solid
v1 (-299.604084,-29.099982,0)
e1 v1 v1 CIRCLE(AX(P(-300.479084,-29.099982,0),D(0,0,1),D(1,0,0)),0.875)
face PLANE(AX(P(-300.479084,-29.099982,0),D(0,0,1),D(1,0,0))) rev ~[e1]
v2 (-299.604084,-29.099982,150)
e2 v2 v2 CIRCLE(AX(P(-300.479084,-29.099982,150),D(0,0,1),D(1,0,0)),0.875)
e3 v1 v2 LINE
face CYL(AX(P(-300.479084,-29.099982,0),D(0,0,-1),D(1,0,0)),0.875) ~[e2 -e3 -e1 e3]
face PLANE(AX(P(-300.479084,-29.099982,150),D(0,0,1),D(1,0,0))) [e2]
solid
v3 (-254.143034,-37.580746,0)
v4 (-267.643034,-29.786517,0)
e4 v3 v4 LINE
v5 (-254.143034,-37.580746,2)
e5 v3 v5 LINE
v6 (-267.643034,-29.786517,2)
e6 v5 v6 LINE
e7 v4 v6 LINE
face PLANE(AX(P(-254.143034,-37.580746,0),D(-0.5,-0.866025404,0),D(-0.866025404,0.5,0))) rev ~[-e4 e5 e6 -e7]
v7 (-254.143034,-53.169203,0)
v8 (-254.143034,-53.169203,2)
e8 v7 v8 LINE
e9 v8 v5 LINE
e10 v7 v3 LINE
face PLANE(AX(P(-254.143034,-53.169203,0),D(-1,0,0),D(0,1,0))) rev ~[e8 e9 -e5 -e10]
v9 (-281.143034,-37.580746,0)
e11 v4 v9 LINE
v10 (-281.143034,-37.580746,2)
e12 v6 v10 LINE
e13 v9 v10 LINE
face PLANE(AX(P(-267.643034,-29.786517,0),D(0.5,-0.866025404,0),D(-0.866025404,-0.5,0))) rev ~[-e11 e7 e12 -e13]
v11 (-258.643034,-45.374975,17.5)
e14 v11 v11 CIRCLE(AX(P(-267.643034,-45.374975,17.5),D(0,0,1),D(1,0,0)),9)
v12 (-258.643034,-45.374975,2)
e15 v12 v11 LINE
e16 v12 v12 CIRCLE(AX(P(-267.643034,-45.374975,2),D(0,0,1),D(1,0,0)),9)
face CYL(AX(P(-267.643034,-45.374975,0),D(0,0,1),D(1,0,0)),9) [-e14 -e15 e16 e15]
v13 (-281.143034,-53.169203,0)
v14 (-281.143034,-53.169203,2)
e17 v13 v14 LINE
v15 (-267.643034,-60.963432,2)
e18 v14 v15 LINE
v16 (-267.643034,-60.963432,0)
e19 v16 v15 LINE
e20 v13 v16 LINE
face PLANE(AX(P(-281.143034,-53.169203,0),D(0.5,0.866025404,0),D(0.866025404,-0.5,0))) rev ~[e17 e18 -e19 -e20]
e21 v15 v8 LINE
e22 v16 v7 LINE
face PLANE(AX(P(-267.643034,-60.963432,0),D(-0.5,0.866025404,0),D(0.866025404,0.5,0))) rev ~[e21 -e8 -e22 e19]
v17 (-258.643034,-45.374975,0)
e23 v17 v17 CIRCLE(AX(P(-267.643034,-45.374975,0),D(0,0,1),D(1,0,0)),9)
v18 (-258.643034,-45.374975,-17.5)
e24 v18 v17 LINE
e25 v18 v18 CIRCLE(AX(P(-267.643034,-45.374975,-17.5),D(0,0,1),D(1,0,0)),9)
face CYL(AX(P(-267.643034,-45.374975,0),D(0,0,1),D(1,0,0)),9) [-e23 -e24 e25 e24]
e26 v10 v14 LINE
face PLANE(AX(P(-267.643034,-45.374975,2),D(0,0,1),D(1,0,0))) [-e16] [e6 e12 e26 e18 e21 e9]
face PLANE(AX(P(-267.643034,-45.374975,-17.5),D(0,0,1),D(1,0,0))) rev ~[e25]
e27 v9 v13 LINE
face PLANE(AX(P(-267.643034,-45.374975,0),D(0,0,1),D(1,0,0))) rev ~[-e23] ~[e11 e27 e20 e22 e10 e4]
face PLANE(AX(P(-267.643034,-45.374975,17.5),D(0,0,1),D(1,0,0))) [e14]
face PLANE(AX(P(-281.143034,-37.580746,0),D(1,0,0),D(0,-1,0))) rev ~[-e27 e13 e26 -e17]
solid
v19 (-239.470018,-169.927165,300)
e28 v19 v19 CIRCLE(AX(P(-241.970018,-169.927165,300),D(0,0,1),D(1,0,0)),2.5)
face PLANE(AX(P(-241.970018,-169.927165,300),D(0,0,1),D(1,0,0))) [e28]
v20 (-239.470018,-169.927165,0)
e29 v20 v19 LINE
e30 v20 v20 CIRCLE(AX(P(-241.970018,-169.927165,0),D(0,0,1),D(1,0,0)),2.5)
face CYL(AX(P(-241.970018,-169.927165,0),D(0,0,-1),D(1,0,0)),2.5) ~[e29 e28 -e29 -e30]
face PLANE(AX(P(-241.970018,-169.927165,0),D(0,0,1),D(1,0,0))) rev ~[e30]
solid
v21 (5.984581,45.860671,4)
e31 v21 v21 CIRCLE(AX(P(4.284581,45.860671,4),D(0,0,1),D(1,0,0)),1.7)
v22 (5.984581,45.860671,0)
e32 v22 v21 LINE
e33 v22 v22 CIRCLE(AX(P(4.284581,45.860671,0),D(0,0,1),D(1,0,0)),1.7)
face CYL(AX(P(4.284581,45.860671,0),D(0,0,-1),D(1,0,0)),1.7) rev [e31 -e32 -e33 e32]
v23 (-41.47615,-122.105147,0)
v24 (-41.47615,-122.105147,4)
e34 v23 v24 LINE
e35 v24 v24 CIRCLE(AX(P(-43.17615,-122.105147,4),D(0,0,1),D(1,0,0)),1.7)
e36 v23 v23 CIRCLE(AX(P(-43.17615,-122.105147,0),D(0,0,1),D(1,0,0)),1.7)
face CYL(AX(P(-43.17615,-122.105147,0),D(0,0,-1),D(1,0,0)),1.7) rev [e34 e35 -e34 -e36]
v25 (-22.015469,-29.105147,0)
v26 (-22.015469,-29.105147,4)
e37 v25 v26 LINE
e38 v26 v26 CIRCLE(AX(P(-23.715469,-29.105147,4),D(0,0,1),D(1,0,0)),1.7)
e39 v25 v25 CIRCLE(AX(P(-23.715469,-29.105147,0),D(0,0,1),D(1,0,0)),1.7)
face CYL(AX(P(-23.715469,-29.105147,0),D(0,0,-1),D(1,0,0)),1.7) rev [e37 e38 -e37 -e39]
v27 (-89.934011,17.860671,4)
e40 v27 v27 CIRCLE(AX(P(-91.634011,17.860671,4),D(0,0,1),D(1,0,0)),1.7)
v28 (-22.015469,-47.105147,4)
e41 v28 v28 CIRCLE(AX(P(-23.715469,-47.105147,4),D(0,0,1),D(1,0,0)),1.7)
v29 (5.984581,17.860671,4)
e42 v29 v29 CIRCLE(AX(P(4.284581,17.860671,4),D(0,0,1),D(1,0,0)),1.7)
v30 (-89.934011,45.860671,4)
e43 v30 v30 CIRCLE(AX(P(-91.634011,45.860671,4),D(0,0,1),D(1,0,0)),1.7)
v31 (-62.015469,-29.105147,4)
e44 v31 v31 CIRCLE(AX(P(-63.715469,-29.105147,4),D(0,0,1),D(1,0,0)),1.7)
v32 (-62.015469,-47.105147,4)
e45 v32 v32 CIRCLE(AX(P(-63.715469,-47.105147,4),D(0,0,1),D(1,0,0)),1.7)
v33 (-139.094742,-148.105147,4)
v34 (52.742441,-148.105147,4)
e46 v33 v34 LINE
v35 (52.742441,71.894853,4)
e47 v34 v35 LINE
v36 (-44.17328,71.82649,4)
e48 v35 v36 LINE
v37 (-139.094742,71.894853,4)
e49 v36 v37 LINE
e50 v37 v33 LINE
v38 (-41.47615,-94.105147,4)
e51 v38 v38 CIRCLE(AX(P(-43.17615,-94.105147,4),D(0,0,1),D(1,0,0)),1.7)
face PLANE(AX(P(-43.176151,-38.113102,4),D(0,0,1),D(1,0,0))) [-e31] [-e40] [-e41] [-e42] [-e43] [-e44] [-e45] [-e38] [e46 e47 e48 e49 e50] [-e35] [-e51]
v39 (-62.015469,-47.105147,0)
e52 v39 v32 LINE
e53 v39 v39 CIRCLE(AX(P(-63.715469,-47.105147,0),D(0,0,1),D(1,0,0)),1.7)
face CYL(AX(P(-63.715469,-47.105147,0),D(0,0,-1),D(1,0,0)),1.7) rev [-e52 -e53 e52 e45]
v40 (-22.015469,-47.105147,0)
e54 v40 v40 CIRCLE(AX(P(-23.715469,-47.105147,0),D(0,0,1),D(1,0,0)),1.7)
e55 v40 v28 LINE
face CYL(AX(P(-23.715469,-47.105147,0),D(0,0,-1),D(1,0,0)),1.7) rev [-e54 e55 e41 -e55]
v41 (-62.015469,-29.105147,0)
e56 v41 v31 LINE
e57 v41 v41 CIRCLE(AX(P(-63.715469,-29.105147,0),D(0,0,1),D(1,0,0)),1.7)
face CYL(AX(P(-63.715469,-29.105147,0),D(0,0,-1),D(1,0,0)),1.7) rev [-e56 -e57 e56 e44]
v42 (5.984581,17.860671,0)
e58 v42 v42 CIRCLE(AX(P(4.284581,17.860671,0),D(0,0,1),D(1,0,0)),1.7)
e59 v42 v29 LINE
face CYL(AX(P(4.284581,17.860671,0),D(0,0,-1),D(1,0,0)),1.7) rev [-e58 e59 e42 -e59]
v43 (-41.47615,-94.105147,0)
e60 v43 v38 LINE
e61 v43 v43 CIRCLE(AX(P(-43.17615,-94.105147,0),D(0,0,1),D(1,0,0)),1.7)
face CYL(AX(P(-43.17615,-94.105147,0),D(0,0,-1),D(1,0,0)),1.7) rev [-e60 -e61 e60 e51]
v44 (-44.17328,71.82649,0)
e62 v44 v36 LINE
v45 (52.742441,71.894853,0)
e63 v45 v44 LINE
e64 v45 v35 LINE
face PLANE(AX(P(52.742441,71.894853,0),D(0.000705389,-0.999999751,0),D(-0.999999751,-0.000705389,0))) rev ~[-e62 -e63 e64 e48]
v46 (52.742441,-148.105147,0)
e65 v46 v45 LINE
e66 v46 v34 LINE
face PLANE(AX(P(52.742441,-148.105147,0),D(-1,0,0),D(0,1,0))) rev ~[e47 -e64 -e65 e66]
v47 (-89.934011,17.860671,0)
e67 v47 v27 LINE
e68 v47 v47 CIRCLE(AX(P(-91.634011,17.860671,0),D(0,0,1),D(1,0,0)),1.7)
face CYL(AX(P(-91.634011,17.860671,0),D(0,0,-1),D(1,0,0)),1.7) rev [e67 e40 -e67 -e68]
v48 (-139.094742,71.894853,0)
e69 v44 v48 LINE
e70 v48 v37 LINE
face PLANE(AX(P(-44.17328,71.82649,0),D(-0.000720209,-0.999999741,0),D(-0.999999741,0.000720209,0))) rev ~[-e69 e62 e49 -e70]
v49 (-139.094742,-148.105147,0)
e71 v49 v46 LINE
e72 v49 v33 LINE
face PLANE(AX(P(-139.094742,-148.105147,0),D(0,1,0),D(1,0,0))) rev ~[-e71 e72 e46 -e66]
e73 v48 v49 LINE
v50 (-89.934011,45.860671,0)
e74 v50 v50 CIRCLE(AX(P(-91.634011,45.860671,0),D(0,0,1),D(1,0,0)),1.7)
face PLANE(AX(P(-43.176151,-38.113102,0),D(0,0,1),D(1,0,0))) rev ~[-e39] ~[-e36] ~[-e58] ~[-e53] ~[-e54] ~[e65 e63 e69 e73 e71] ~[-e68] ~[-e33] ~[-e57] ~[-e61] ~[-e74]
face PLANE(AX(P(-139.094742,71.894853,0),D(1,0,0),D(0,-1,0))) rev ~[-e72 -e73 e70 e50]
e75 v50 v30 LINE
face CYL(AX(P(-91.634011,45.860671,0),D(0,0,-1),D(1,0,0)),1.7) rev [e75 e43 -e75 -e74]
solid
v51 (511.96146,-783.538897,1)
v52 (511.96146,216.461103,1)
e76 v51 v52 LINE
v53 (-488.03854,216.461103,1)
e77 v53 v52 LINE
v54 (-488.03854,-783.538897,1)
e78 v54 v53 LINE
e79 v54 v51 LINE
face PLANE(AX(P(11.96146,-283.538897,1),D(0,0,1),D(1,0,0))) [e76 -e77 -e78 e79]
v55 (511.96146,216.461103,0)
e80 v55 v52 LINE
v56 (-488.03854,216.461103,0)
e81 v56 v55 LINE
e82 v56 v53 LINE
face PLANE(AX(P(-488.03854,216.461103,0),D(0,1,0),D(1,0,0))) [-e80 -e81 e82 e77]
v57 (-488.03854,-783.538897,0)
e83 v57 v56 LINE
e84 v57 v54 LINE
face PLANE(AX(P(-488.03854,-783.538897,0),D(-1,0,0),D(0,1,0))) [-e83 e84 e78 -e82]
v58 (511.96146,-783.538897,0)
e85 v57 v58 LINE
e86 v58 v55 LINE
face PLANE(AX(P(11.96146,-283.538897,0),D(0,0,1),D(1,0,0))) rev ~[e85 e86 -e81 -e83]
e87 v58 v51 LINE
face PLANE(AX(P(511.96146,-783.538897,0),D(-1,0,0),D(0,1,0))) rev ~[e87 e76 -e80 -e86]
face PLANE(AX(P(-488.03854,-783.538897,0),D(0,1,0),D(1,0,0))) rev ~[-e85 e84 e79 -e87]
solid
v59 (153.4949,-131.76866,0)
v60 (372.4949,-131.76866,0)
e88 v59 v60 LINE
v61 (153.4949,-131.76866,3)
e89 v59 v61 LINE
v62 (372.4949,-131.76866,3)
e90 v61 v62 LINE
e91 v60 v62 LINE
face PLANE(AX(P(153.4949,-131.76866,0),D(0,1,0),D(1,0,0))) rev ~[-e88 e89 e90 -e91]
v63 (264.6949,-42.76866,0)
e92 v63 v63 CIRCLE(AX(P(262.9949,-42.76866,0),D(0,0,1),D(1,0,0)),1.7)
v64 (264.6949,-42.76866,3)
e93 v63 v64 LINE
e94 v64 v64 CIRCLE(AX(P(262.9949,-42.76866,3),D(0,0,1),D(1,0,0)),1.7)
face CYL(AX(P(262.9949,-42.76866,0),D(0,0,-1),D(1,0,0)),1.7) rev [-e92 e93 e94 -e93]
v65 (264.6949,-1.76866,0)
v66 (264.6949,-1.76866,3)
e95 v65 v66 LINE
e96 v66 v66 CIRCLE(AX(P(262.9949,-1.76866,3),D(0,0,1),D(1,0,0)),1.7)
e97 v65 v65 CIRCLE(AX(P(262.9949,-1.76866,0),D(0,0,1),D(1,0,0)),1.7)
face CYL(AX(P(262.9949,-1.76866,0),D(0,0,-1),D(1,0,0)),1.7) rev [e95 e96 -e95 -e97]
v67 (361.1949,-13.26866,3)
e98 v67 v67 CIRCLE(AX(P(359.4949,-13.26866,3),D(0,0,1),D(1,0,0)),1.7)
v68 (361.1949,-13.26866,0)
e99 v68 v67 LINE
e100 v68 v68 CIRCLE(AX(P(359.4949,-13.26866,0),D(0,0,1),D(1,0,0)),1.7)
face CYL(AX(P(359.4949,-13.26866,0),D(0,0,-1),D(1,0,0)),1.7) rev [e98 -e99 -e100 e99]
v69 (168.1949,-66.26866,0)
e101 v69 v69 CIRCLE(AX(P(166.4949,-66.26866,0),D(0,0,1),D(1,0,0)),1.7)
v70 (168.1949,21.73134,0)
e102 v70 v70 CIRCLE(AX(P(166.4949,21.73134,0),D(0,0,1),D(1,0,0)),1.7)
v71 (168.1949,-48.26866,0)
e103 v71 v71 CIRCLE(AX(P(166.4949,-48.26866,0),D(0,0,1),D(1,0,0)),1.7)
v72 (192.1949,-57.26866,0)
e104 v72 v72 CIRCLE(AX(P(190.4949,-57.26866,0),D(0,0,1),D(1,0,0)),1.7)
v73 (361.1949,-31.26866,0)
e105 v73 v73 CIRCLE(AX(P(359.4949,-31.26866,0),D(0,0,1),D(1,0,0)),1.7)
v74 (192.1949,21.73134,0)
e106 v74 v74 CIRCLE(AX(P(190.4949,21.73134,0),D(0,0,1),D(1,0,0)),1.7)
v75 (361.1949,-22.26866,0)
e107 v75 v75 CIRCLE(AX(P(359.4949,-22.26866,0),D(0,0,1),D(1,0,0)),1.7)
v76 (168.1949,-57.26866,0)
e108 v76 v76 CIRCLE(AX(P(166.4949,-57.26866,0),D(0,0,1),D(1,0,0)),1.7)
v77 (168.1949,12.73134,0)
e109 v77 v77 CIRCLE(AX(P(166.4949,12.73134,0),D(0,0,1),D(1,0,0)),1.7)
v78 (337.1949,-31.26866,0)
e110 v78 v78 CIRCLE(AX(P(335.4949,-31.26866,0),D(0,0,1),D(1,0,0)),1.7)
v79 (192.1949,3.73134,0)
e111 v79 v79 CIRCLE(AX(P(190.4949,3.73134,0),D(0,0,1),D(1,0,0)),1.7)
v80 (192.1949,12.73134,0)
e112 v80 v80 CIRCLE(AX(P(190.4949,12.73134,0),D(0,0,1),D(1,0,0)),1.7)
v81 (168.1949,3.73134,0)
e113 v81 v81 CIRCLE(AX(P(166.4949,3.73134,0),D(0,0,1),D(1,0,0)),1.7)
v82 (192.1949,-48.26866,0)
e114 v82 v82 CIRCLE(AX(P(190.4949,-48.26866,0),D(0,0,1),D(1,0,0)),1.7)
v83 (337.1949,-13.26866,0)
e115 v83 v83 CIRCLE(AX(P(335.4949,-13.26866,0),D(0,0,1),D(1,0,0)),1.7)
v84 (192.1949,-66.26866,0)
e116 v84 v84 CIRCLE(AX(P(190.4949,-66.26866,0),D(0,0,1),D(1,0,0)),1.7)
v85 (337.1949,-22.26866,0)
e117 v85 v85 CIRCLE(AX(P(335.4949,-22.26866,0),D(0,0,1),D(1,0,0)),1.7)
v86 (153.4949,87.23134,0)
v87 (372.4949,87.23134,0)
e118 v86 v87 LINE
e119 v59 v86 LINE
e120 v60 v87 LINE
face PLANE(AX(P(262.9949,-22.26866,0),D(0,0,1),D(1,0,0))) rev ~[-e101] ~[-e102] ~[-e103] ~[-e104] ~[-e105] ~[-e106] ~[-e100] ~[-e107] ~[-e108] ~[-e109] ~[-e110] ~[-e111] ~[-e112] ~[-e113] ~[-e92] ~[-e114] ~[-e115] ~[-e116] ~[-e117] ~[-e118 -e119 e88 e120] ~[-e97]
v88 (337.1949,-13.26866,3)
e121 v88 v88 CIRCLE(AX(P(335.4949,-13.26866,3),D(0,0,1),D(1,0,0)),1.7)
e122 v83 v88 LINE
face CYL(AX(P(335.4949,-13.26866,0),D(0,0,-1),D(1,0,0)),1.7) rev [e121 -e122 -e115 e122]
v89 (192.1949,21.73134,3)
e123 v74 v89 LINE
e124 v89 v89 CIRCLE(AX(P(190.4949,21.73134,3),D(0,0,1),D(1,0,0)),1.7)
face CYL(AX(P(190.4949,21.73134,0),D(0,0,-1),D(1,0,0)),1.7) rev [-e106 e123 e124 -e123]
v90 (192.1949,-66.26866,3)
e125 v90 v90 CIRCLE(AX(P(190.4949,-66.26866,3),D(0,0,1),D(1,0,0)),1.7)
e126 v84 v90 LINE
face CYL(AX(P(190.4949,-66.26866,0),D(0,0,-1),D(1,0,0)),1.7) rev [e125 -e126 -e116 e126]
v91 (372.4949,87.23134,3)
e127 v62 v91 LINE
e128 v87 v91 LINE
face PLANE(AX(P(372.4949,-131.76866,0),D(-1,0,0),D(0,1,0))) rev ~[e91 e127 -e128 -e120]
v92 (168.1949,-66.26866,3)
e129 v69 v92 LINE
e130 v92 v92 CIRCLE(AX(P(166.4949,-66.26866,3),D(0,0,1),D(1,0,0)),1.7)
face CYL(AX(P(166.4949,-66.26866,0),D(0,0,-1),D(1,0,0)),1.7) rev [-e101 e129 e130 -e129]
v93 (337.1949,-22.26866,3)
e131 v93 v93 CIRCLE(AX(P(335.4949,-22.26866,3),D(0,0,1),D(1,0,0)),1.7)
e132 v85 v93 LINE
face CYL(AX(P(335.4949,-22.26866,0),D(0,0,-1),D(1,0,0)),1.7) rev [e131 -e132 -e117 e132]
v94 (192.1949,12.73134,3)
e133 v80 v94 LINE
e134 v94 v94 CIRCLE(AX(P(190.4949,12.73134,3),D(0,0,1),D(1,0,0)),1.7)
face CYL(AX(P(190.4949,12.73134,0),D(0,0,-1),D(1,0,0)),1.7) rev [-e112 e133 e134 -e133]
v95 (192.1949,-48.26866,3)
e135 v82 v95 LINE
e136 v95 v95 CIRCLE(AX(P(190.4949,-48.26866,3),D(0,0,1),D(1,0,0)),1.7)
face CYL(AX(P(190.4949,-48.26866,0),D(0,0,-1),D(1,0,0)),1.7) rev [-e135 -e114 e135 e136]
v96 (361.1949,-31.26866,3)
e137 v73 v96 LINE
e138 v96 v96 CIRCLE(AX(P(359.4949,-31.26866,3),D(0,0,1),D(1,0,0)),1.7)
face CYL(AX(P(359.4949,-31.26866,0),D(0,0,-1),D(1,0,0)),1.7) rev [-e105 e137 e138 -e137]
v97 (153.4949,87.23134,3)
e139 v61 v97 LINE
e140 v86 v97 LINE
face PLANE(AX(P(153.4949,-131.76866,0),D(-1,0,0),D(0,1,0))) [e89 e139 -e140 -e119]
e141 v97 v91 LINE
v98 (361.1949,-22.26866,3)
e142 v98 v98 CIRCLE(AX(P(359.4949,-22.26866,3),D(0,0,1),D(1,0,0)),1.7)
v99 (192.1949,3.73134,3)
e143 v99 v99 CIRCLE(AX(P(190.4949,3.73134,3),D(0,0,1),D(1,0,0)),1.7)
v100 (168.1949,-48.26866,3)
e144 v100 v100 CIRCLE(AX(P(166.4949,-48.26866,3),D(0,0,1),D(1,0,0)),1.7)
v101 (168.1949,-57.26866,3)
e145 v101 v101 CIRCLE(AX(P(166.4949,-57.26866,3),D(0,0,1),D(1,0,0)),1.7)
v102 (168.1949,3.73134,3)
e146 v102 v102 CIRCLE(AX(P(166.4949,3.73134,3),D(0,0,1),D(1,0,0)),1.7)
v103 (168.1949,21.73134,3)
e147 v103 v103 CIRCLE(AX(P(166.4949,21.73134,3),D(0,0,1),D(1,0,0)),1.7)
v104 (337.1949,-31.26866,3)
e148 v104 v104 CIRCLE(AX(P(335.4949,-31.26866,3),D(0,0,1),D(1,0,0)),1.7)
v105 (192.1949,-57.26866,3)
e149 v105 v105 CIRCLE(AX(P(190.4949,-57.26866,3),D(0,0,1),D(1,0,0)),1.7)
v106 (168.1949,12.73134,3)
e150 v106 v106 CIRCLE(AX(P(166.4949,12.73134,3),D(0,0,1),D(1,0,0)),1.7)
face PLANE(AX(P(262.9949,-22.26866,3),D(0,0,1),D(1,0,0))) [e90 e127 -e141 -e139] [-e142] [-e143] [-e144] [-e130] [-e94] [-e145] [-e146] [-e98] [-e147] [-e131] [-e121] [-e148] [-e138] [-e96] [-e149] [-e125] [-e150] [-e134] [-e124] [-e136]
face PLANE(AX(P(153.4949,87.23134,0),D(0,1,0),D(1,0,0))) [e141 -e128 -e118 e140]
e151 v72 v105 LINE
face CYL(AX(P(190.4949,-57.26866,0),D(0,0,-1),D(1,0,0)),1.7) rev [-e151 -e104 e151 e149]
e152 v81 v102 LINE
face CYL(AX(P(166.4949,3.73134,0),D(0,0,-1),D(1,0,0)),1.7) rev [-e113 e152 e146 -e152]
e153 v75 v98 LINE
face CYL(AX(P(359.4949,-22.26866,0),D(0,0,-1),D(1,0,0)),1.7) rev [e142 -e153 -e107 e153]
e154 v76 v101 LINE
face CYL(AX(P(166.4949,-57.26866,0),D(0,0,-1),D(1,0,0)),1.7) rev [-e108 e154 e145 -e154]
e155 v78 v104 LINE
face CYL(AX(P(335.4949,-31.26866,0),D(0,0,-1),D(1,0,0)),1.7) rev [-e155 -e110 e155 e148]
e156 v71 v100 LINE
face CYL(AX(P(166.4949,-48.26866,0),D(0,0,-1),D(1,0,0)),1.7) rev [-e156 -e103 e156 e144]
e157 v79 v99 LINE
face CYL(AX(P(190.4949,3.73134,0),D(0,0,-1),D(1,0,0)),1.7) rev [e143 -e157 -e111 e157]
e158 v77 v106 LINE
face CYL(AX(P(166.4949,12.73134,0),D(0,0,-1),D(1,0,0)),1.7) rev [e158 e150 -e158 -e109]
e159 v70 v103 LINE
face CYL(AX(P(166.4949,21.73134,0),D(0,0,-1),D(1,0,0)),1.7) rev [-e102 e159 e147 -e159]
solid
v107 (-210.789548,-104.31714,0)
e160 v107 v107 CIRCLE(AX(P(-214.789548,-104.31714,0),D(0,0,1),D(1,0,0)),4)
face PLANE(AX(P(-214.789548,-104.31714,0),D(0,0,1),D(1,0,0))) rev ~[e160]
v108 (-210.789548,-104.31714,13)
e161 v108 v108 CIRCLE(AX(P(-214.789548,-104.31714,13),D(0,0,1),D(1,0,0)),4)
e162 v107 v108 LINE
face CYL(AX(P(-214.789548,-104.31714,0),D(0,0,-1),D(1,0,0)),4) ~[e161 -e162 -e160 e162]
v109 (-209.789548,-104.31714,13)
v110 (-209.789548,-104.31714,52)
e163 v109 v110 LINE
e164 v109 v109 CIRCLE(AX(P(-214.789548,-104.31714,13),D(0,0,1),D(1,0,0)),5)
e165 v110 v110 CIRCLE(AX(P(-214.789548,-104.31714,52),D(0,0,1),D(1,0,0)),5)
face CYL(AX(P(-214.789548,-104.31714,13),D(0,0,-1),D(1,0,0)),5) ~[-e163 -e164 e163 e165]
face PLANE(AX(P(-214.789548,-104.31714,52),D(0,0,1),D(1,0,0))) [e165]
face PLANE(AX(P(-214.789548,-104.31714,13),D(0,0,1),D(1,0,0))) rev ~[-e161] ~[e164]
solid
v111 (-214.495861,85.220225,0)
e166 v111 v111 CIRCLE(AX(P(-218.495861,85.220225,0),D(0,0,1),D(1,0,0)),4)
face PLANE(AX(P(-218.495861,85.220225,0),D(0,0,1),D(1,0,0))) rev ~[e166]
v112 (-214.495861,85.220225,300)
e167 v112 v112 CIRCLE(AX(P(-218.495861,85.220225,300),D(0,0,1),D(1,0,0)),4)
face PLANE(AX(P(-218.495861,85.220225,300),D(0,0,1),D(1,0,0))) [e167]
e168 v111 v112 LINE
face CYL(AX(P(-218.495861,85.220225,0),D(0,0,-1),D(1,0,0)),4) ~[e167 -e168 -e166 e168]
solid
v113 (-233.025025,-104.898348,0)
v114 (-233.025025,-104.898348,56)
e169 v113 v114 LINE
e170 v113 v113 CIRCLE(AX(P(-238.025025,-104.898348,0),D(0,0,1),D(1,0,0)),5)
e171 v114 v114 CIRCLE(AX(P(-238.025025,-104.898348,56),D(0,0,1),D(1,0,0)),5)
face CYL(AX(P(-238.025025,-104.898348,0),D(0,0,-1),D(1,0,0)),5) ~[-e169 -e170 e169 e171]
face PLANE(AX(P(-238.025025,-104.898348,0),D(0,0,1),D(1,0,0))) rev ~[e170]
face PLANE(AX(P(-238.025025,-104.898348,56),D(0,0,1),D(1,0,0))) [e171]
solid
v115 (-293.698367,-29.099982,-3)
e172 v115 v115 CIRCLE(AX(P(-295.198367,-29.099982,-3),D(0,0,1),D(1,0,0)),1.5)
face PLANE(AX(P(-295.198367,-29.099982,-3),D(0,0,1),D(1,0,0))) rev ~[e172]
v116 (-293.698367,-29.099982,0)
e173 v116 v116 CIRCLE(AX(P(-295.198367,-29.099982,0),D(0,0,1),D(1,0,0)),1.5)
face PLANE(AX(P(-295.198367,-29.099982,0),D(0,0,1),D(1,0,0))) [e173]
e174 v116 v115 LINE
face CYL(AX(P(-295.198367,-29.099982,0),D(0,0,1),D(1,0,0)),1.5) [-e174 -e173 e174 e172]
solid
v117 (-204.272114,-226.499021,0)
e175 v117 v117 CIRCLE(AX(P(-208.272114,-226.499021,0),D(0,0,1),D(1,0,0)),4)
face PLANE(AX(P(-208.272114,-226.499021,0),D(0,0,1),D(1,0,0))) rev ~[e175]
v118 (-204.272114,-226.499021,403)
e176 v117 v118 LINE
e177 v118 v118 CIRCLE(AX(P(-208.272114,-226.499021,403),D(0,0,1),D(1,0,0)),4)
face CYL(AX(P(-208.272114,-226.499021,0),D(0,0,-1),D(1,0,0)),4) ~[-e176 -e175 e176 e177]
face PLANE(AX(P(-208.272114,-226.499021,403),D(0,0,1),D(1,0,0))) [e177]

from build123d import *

# Parameters (mm, degrees)
F0_R      = 1.7
F1_DEPTH  = 4
F2_R      = 4
F3_DEPTH  = 300
F4_W      = 1000
F4_H      = 1000
F5_DEPTH  = 1
F6_R      = 4
F7_DEPTH  = 403
F6_R_2    = 2.5
F8_DEPTH  = 300
F6_R_3    = 9
F9_DEPTH  = 17.5
F10_DEPTH = 2
F6_R_4    = 5
F11_DEPTH = 56
F12_START = 13
F12_DEPTH = 39
F13_DEPTH = 52
F14_W     = 219
F14_H     = 219
F14_R     = 1.7
F15_DEPTH = 3
F2_R_2    = 0.875
F16_DEPTH = 150
F14_R_2   = 1.5
F17_DEPTH = 3


with BuildPart() as f1:
    # F0 (on Top) → F1 (new body)
    with BuildSketch(Plane.XY):
        Polygon((-139.0947423129, 71.8948530406), (-139.0947423129, -148.1051469594), (52.7424413346, -148.1051469594), (52.7424413346, 71.8948530406), (-44.1732802409, 71.8264897118), align=None)
        with Locations((-63.7154691358, -47.1051469594)):
            Circle(F0_R, mode=Mode.SUBTRACT)
        with Locations((-43.1761504892, -122.1051469594)):
            Circle(F0_R, mode=Mode.SUBTRACT)
        with Locations((-43.1761504892, -94.1051469594)):
            Circle(F0_R, mode=Mode.SUBTRACT)
        with Locations((-23.7154691358, -47.1051469594)):
            Circle(F0_R, mode=Mode.SUBTRACT)
        with Locations((-63.7154691358, -29.1051469594)):
            Circle(F0_R, mode=Mode.SUBTRACT)
        with Locations((-91.6340112769, 17.8606713762)):
            Circle(F0_R, mode=Mode.SUBTRACT)
        with Locations((-91.6340112769, 45.8606713762)):
            Circle(F0_R, mode=Mode.SUBTRACT)
        with Locations((-23.7154691358, -29.1051469594)):
            Circle(F0_R, mode=Mode.SUBTRACT)
        with Locations((4.2845805468, 17.8606713762)):
            Circle(F0_R, mode=Mode.SUBTRACT)
        with Locations((4.2845805468, 45.8606713762)):
            Circle(F0_R, mode=Mode.SUBTRACT)
    extrude(amount=F1_DEPTH)


with BuildPart() as f3:
    # F2 (on Top) → F3 (new body)
    with BuildSketch(Plane.XY):
        with Locations((-218.4958606958, 85.2202251554)):
            Circle(F2_R)
    extrude(amount=F3_DEPTH)


with BuildPart() as f5:
    # F4 (on Top) → F5 (new body)
    with BuildSketch(Plane.XY):
        with Locations((11.9614601135, -283.5388973286)):
            Rectangle(F4_W, F4_H)
    extrude(amount=F5_DEPTH)


with BuildPart() as f7:
    # F6 (on Top) → F7 (new body)
    with BuildSketch(Plane.XY):
        with Locations((-208.2721143961, -226.4990210533)):
            Circle(F6_R)
    extrude(amount=F7_DEPTH)


with BuildPart() as f8:
    # F6 (on Top) → F8 (new body)
    with BuildSketch(Plane.XY):
        with Locations((-241.9700175524, -169.9271649122)):
            Circle(F6_R_2)
    extrude(amount=F8_DEPTH)


with BuildPart() as f9:
    # F6 (on Top) → F9 (new body, symmetric)
    with BuildSketch(Plane.XY):
        with Locations((-267.6430344582, -45.3749746084)):
            Circle(F6_R_3)
    extrude(amount=F9_DEPTH, both=True)

    # F6 (on Top) → F10 (join)
    with BuildSketch(Plane.XY):
        Polygon((-281.1430344582, -37.5807459744), (-281.1430344582, -53.1692032425), (-267.6430344582, -60.9634318765), (-254.1430344582, -53.1692032425), (-254.1430344582, -37.5807459744), (-267.6430344582, -29.7865173403), align=None)
        with Locations((-267.6430344582, -45.3749746084)):
            Circle(F6_R_3, mode=Mode.SUBTRACT)
    extrude(amount=F10_DEPTH)


with BuildPart() as f11:
    # F6 (on Top) → F11 (new body)
    with BuildSketch(Plane.XY):
        with Locations((-238.0250245333, -104.8983484507)):
            Circle(F6_R_4)
    extrude(amount=F11_DEPTH)


with BuildPart() as f12:
    # F6 (on Top) → F12 (new body)
    with BuildSketch(Plane.XY.offset(F12_START)):
        with Locations((-214.7895480695, -104.3171395545)):
            Circle(F6_R_4)
        with Locations((-214.7895480695, -104.3171395545)):
            Circle(F6_R, mode=Mode.SUBTRACT)
    extrude(amount=F12_DEPTH)

    # F6 (on Top) → F13 (join)
    with BuildSketch(Plane.XY):
        with Locations((-214.7895480695, -104.3171395545)):
            Circle(F6_R)
    extrude(amount=F13_DEPTH)


with BuildPart() as f15:
    # F14 (on Top) → F15 (new body)
    with BuildSketch(Plane.XY):
        with Locations((262.9949003458, -22.268660448)):
            Rectangle(F14_W, F14_H)
        with Locations((166.4949003458, -66.268660448)):
            Circle(F14_R, mode=Mode.SUBTRACT)
        with Locations((190.4949003458, -66.268660448)):
            Circle(F14_R, mode=Mode.SUBTRACT)
        with Locations((166.4949003458, -57.268660448)):
            Circle(F14_R, mode=Mode.SUBTRACT)
        with Locations((190.4949003458, -57.268660448)):
            Circle(F14_R, mode=Mode.SUBTRACT)
        with Locations((166.4949003458, -48.268660448)):
            Circle(F14_R, mode=Mode.SUBTRACT)
        with Locations((190.4949003458, -48.268660448)):
            Circle(F14_R, mode=Mode.SUBTRACT)
        with Locations((262.9949003458, -42.768660448)):
            Circle(F14_R, mode=Mode.SUBTRACT)
        with Locations((335.4949003458, -31.268660448)):
            Circle(F14_R, mode=Mode.SUBTRACT)
        with Locations((359.4949003458, -31.268660448)):
            Circle(F14_R, mode=Mode.SUBTRACT)
        with Locations((166.4949003458, 3.731339552)):
            Circle(F14_R, mode=Mode.SUBTRACT)
        with Locations((190.4949003458, 3.731339552)):
            Circle(F14_R, mode=Mode.SUBTRACT)
        with Locations((166.4949003458, 12.731339552)):
            Circle(F14_R, mode=Mode.SUBTRACT)
        with Locations((190.4949003458, 12.731339552)):
            Circle(F14_R, mode=Mode.SUBTRACT)
        with Locations((166.4949003458, 21.731339552)):
            Circle(F14_R, mode=Mode.SUBTRACT)
        with Locations((190.4949003458, 21.731339552)):
            Circle(F14_R, mode=Mode.SUBTRACT)
        with Locations((262.9949003458, -1.768660448)):
            Circle(F14_R, mode=Mode.SUBTRACT)
        with Locations((335.4949003458, -22.268660448)):
            Circle(F14_R, mode=Mode.SUBTRACT)
        with Locations((359.4949003458, -22.268660448)):
            Circle(F14_R, mode=Mode.SUBTRACT)
        with Locations((335.4949003458, -13.268660448)):
            Circle(F14_R, mode=Mode.SUBTRACT)
        with Locations((359.4949003458, -13.268660448)):
            Circle(F14_R, mode=Mode.SUBTRACT)
    extrude(amount=F15_DEPTH)


with BuildPart() as f16:
    # F2 (on Top) → F16 (new body)
    with BuildSketch(Plane.XY):
        with Locations((-300.4790842533, -29.0999822319)):
            Circle(F2_R_2)
    extrude(amount=F16_DEPTH)


with BuildPart() as f17:
    # F14 (on Top) → F17 (new body)
    with BuildSketch(Plane.XY):
        with Locations((-295.1983672105, -29.0999822319)):
            Circle(F14_R_2)
    extrude(amount=-F17_DEPTH)


solid = Compound([f1.part, f3.part, f5.part, f7.part, f8.part, f9.part, f11.part, f12.part, f15.part, f16.part, f17.part])
